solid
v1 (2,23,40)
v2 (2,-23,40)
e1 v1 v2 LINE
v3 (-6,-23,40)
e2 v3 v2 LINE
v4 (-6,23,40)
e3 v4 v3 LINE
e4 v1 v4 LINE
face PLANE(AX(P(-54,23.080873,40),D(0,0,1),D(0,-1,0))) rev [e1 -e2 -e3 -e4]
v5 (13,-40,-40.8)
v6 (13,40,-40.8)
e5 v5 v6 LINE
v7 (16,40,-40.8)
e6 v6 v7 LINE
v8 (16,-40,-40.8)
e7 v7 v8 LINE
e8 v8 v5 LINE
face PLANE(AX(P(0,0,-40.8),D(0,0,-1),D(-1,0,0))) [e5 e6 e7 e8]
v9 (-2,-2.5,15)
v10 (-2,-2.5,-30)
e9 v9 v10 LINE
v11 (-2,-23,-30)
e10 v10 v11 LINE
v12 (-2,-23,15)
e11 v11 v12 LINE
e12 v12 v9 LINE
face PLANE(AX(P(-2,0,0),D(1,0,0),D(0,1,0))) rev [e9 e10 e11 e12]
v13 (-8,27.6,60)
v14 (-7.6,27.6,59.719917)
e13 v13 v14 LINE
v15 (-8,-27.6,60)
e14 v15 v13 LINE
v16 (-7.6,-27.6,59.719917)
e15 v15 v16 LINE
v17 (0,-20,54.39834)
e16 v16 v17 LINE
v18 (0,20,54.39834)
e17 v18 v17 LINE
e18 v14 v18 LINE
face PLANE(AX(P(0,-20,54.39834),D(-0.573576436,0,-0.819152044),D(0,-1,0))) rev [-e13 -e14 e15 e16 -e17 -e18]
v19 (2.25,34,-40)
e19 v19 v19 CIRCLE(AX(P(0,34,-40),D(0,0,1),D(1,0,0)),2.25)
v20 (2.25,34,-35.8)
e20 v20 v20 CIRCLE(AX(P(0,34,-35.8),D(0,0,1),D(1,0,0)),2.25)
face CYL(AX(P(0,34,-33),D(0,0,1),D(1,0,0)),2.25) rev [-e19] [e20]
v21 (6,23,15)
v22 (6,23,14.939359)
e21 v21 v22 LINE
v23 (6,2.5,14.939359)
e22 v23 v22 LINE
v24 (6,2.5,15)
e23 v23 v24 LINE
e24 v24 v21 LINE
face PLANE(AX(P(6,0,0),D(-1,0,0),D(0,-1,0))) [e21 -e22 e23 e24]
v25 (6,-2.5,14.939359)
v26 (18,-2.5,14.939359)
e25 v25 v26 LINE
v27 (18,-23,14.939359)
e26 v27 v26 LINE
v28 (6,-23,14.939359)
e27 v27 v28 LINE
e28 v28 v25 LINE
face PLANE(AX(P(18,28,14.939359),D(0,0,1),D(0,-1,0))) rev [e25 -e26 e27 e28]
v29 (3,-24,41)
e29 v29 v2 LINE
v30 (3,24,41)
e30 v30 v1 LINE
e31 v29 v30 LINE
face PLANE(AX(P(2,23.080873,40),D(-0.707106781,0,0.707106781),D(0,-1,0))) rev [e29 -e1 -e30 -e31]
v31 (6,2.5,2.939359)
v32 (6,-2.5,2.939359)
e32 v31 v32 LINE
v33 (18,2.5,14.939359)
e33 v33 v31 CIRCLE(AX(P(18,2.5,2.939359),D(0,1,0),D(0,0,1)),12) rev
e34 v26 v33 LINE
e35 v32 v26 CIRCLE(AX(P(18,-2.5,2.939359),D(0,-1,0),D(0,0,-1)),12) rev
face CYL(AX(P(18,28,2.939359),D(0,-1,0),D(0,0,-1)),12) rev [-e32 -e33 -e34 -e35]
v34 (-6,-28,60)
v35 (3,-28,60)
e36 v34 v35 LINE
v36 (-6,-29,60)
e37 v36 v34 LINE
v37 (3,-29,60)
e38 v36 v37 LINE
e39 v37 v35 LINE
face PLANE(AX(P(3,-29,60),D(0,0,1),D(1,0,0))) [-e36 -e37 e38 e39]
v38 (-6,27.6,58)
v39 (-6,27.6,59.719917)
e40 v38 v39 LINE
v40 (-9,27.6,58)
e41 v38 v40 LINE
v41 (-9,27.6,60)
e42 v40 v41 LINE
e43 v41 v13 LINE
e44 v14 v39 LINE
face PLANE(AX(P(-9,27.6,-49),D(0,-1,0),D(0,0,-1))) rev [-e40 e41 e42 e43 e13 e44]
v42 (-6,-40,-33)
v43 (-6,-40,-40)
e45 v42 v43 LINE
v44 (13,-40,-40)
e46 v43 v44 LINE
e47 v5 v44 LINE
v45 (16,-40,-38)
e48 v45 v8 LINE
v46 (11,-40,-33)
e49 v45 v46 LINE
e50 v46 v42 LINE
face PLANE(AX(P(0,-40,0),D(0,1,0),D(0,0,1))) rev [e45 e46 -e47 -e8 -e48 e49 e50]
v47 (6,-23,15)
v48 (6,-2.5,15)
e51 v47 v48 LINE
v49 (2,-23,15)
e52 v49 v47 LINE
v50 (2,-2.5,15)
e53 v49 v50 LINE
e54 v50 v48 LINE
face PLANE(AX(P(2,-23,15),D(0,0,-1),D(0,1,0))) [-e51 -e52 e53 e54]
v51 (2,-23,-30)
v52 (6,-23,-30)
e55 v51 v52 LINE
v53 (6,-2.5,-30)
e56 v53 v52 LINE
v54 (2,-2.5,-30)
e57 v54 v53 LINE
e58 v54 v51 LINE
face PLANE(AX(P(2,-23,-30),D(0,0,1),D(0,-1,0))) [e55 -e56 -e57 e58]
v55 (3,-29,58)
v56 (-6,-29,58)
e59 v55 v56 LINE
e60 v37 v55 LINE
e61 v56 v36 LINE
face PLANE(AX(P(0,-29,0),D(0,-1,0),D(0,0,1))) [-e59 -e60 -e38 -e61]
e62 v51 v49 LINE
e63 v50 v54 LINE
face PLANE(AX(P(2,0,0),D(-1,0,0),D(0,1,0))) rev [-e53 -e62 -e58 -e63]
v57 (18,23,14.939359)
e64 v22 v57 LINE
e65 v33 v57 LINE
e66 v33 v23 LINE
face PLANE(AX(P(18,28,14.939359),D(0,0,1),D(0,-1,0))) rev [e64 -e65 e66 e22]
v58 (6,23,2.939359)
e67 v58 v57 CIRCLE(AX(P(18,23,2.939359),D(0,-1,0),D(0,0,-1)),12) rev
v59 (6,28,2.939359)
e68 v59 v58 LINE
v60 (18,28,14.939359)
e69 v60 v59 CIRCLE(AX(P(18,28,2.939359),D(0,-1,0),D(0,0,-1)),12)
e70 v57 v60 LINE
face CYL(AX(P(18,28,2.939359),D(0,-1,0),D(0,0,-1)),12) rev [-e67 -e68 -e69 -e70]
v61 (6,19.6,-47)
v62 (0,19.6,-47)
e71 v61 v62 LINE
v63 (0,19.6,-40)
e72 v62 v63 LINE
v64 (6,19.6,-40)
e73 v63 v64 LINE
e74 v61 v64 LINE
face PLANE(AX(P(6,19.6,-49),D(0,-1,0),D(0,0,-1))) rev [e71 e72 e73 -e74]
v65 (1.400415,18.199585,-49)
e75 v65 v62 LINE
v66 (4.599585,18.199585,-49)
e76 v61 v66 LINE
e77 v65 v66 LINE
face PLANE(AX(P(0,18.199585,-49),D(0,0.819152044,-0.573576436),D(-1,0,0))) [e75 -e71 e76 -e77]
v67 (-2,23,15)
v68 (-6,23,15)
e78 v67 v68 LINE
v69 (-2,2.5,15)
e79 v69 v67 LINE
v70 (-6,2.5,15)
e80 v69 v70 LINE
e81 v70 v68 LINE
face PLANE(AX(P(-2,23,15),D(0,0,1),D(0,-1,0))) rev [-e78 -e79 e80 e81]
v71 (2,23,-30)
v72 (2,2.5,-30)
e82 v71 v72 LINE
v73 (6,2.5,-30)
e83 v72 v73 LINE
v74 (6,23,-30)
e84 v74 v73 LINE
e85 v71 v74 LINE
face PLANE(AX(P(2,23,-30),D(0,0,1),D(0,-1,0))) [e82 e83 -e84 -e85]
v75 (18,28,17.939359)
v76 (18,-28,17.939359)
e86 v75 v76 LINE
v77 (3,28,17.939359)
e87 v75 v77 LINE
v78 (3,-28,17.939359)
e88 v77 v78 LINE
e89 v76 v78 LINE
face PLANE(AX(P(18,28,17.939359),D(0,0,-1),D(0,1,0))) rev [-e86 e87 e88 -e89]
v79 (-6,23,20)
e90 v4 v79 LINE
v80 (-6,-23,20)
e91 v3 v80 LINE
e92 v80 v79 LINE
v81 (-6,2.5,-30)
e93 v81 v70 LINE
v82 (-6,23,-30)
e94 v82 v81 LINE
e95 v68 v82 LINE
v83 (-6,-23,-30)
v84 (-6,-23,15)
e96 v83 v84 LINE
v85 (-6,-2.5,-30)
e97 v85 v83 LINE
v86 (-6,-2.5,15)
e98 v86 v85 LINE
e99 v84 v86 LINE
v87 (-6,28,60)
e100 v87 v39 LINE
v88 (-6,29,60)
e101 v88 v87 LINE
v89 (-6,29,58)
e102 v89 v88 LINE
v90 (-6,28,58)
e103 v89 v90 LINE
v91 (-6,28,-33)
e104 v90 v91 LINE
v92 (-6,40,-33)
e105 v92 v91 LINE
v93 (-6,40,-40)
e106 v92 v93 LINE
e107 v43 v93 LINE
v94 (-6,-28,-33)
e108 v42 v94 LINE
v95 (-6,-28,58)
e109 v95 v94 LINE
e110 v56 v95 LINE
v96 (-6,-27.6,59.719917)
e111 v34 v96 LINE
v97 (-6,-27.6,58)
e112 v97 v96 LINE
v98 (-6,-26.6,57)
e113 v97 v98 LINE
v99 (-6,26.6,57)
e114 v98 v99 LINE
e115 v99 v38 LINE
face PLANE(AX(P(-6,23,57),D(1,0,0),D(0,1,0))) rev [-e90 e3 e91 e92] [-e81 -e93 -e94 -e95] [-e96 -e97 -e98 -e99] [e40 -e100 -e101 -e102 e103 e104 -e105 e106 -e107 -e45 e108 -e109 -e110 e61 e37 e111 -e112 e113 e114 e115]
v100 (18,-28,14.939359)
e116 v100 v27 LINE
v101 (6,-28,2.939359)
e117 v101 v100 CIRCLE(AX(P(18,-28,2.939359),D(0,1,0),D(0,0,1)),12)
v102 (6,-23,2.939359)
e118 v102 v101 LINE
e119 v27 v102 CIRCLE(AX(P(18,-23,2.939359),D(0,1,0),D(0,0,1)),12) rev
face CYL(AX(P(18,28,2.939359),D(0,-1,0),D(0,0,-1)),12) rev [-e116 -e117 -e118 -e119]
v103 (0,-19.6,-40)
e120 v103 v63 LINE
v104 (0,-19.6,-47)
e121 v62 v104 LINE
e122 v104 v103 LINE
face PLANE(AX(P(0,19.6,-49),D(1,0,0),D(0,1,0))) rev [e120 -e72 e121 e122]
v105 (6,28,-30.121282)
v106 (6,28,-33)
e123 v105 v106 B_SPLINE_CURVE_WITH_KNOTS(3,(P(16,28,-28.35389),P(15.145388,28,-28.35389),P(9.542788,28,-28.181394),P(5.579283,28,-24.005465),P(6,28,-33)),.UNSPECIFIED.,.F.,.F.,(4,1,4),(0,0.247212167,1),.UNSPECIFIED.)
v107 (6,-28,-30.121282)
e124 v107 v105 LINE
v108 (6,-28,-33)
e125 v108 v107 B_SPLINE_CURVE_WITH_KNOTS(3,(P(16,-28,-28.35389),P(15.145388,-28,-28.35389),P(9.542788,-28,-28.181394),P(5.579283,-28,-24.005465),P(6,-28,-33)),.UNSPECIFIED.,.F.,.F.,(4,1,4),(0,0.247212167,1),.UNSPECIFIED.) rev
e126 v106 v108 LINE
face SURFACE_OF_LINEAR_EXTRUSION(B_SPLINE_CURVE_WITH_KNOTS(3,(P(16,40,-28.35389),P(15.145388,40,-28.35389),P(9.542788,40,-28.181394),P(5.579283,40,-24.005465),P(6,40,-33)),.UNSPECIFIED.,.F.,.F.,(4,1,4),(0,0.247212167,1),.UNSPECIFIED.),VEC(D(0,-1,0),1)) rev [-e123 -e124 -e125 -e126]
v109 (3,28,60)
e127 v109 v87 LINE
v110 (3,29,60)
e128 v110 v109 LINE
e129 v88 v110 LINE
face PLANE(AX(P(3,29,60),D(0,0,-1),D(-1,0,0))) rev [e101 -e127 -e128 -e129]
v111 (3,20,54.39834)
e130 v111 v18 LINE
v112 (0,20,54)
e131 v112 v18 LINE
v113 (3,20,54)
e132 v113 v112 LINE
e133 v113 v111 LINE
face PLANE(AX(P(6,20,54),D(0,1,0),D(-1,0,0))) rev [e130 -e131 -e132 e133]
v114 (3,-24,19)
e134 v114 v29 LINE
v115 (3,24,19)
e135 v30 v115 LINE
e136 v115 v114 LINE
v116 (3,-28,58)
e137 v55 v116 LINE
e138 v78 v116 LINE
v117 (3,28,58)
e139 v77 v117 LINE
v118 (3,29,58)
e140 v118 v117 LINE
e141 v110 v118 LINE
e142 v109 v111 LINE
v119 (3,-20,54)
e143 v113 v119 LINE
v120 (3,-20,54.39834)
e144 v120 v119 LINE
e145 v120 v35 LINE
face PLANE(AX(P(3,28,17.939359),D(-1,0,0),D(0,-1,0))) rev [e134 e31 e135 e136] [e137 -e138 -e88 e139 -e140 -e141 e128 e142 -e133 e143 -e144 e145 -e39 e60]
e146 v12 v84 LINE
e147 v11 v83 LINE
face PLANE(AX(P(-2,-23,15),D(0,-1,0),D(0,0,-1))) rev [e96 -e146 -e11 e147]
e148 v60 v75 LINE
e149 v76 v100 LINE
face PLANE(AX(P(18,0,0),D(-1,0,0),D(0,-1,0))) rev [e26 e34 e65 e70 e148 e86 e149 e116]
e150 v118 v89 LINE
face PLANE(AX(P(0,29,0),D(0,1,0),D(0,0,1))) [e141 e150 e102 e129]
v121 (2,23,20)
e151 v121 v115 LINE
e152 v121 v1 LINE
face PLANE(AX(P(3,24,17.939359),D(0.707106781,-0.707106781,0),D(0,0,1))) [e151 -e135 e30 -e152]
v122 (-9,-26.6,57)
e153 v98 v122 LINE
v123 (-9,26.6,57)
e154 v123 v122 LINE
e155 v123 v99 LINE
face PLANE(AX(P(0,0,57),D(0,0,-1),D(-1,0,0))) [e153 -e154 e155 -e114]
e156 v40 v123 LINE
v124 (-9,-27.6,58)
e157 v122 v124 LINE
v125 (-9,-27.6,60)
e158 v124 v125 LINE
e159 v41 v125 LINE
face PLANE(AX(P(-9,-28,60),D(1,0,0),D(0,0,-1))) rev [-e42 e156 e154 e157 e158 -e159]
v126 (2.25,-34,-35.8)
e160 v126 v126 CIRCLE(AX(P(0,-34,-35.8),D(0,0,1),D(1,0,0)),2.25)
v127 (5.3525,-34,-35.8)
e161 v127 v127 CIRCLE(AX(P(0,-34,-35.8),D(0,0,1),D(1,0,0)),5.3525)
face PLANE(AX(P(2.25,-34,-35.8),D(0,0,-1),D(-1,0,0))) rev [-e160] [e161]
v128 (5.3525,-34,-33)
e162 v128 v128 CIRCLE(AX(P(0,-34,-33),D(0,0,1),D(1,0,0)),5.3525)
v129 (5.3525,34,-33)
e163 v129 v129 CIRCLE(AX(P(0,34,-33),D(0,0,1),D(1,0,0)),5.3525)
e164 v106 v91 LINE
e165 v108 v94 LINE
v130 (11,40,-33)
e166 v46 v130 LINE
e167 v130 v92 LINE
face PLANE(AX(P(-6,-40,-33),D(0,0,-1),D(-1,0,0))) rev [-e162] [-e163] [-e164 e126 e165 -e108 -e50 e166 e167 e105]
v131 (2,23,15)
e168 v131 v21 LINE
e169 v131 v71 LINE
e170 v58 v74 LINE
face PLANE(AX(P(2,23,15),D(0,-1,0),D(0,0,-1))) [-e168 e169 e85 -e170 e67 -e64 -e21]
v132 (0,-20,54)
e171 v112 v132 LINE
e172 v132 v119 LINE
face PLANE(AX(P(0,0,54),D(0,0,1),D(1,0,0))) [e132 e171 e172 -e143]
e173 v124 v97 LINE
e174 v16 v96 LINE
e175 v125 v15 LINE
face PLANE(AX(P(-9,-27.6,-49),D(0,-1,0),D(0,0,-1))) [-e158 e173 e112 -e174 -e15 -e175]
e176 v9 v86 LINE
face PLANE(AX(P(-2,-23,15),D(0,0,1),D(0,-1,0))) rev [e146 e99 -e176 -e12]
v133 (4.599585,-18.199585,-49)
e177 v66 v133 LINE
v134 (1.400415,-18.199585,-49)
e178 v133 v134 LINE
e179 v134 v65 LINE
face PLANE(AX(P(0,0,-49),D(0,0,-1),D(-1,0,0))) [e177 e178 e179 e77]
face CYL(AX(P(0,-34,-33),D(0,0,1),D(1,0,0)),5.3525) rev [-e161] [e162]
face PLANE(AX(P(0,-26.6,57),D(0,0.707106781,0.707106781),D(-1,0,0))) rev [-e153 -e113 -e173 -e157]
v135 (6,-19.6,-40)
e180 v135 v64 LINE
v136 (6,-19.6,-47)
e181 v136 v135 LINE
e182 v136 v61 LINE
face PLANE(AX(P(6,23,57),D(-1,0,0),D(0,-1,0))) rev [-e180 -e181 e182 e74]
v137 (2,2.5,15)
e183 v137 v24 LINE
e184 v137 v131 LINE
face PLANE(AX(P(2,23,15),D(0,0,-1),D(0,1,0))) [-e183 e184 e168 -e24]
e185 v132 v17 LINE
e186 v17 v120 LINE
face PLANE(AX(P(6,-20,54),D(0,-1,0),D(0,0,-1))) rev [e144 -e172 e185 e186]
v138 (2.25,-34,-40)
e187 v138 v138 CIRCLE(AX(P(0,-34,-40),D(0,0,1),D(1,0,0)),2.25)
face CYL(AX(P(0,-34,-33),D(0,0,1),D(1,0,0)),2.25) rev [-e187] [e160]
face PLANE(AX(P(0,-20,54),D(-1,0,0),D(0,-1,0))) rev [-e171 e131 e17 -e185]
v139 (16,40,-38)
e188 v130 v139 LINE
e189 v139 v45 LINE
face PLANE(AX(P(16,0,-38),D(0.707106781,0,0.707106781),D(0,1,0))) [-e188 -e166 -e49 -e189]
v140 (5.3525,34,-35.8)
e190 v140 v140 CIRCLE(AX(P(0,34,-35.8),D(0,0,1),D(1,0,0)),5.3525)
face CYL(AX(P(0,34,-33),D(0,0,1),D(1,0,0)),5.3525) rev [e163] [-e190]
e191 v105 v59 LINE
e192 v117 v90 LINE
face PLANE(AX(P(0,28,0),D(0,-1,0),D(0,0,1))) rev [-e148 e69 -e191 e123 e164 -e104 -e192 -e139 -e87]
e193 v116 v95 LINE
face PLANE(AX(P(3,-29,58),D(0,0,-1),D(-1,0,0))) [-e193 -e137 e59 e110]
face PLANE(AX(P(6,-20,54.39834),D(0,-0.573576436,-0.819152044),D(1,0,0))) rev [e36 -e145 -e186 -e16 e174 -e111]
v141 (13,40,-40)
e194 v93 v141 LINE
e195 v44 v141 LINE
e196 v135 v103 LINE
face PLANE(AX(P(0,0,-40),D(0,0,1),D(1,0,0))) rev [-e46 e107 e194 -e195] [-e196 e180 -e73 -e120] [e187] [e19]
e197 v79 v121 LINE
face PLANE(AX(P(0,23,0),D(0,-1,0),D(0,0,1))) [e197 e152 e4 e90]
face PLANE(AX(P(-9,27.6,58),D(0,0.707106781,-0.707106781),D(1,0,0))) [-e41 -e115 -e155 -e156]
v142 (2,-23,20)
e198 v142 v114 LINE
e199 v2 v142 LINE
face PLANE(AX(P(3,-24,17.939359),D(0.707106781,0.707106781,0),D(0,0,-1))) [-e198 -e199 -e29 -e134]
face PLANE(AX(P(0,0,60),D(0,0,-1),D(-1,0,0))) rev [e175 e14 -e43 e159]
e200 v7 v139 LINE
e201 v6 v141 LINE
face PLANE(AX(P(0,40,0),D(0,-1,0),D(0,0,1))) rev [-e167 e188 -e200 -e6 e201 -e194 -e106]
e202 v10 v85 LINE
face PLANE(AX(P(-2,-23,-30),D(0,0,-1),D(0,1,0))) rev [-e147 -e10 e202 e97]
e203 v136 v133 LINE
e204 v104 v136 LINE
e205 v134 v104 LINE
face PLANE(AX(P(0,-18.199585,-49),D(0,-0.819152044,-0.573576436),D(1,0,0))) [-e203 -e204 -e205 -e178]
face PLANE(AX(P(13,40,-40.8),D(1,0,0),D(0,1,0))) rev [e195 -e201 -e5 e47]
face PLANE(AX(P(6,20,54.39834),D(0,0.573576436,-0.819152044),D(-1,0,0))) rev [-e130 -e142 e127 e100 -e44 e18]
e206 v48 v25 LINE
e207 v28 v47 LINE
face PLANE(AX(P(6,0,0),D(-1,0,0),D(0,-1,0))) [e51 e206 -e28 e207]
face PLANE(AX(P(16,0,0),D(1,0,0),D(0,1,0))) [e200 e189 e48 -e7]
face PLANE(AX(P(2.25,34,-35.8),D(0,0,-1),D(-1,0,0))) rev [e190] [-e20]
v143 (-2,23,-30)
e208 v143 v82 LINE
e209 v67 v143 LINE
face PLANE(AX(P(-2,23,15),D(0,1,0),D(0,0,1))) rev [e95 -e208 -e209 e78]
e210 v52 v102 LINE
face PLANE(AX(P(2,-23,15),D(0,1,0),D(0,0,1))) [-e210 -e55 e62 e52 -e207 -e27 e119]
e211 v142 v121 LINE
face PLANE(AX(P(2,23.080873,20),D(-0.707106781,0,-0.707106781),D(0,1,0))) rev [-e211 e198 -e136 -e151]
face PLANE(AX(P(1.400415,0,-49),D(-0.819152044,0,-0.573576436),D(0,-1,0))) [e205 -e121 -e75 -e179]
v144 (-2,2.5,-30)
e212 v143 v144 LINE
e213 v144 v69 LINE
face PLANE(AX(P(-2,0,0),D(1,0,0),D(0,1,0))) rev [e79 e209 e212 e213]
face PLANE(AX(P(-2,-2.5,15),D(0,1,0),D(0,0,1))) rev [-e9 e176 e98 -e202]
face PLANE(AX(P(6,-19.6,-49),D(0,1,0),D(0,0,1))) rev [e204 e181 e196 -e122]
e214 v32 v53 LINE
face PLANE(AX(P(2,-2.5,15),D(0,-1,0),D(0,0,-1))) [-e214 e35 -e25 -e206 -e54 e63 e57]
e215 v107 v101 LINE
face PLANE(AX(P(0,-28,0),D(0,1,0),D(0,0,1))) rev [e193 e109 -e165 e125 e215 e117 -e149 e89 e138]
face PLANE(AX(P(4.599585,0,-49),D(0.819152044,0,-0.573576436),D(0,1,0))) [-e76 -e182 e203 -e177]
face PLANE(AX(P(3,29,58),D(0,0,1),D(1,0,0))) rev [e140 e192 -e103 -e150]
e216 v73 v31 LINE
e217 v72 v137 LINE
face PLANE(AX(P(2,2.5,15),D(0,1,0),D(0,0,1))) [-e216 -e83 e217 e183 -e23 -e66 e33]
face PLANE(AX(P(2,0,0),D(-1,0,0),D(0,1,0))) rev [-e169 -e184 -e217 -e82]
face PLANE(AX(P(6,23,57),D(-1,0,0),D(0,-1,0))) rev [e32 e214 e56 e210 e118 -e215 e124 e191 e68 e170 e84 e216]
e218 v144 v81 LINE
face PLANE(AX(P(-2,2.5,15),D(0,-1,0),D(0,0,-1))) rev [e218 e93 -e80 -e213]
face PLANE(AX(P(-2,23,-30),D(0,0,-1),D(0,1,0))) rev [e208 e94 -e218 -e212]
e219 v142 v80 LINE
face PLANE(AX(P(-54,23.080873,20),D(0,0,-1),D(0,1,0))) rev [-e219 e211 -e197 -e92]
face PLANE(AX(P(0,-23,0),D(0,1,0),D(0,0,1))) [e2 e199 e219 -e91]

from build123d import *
from OCP.BRepFilletAPI import BRepFilletAPI_MakeChamfer

# Parameters (mm, degrees)
SKETCH_1_W              = 12
SKETCH_1_H              = 46
EXTRUDE_1_DEPTH         = 57
SKETCH_2_W              = 20
SKETCH_2_H              = 46.080872769
CUT_EXTRUDE_1_DEPTH     = 60
SKETCH_3_W              = 12
SKETCH_3_H              = 57
EXTRUDE_2_DEPTH         = 5
SKETCH_4_W              = 12
SKETCH_4_H              = 56
EXTRUDE_3_DEPTH         = 40
SKETCH_5_W              = 12
SKETCH_5_H              = 7
EXTRUDE_4_DEPTH         = 12
M4_A_1_D                = 4.5
M4_A_1_CBORE_D          = 10.705
M4_A_1_CBORE_DEPTH      = 2.8
SKETCH_8_W              = 15
SKETCH_8_H              = 56
EXTRUDE_5_DEPTH         = 3
SKETCH_9_W              = 6
SKETCH_9_H              = 40
CUT_EXTRUDE_2_DEPTH     = 6
CHAMFER_1_SIZE          = 8
CHAMFER_1_SIZE_2        = 5.601660306
SKETCH_10_W             = 6
SKETCH_10_H             = 39.2
EXTRUDE_6_DEPTH         = 9
CUT_EXTRUDE_START       = -4
CUT_EXTRUDE_3_OUTLINE_W = 3
CUT_EXTRUDE_3_OUTLINE_H = 0.4
CUT_EXTRUDE_3_DEPTH     = 5
CHAMFER_2_SIZE          = 1
CHAMFER_3_SIZE          = 2
CHAMFER_3_SIZE2         = 1.400415076
SKETCH_12_W             = 45
SKETCH_12_H             = 20.5
CUT_EXTRUDE_4_DEPTH     = 4
SKETCH_14_W             = 7
SKETCH_14_H             = 80
EXTRUDE_7_DEPTH         = 10
CUT_EXTRUDE_5_DEPTH     = 102.271911209
SKETCH_16_W             = 3
SKETCH_16_H             = 56
EXTRUDE_8_DEPTH         = 12
CHAMFER_5_SIZE          = 5
CUT_EXTRUDE_START_2     = -42.060641
SKETCH_17_W             = 3
SKETCH_17_H             = 56
CUT_EXTRUDE_6_DEPTH     = 42.060641
CHAMFER_4_SIZE          = 1
FILLET_1_R              = 12
SKETCH_22_W             = 3
SKETCH_22_H             = 80
EXTRUDE_11_DEPTH        = 0.8
SKETCH_24_W             = 9
SKETCH_24_H             = 2
EXTRUDE_13_DEPTH        = 1


with BuildPart() as part:
    # 스케치1 → 보스-돌출1 (new body)
    with BuildSketch(Plane.XY):
        Rectangle(SKETCH_1_W, SKETCH_1_H)
    extrude(amount=EXTRUDE_1_DEPTH)

    # 스케치2 → 컷-돌출1 (cut)
    with BuildSketch(Plane(origin=(6, 0, 0), x_dir=(0, 0, -1), z_dir=(1, 0, 0))):
        with Locations((-30, 0.040436385)):
            Rectangle(SKETCH_2_W, SKETCH_2_H)
    extrude(amount=-CUT_EXTRUDE_1_DEPTH, mode=Mode.SUBTRACT)


with BuildPart() as cut_extrude_1_piece_1:
    # of the separate pieces the step leaves, piece 1, a body of its own (cut_extrude_1_pieces)
    add(part.part.solids().sort_by_distance((-6, 23, 0))[0])



with BuildPart() as cut_extrude_1_piece_2:
    # of the separate pieces the step leaves, piece 2, a body of its own (cut_extrude_1_pieces)
    add(part.part.solids().sort_by_distance((6, 23, 40))[0])


with BuildPart() as cut_extrude_1_piece_1_1:
    add(cut_extrude_1_piece_1.part)

    add(cut_extrude_1_piece_2.part)  # 보스-돌출2 merges 컷-돌출1 piece 2
    # 스케치3 → 보스-돌출2 (add)
    with BuildSketch(Plane.XZ.offset(23)):
        with Locations((0, 28.5)):
            Rectangle(SKETCH_3_W, SKETCH_3_H)
    extrude_2 = extrude(amount=EXTRUDE_2_DEPTH)

    # 대칭 복사1: 보스-돌출2 across plane
    add(extrude_2.mirror(Plane.ZX))

    # 스케치4 → 보스-돌출3 (add)
    with BuildSketch(Plane(origin=(0, 0, 0), x_dir=(-1, 0, 0), z_dir=(0, 0, -1))):
        Rectangle(SKETCH_4_W, SKETCH_4_H)
    extrude(amount=EXTRUDE_3_DEPTH)

    # 스케치5 → 보스-돌출4 (add)
    with BuildSketch(Plane.XZ.offset(28)):
        with Locations((0, -36.5)):
            Rectangle(SKETCH_5_W, SKETCH_5_H)
    extrude_4 = extrude(amount=EXTRUDE_4_DEPTH)

    # 대칭 복사2: 보스-돌출4 across plane
    add(extrude_4.mirror(Plane.ZX))

    # M4 육각 머리 볼트용 카운터보어 (A 등급)1 (through all)
    with Locations(Plane.XY.offset(-33)):
        with Locations((0, -34), (0, 34)):
            CounterBoreHole(M4_A_1_D / 2, M4_A_1_CBORE_D / 2, M4_A_1_CBORE_DEPTH)

    # 스케치8 → 보스-돌출5 (add)
    with BuildSketch(Plane.XY.offset(57)):
        with Locations((-1.5, 0)):
            Rectangle(SKETCH_8_W, SKETCH_8_H)
    extrude(amount=EXTRUDE_5_DEPTH)

    # 스케치9 → 컷-돌출2 (cut)
    with BuildSketch(Plane.XY.offset(60)):
        with Locations((3, 0)):
            Rectangle(SKETCH_9_W, SKETCH_9_H)
    extrude(amount=-CUT_EXTRUDE_2_DEPTH, mode=Mode.SUBTRACT)

    # 모따기1
    chamfer_1_edges_1 = [cut_extrude_1_piece_1_1.edges().sort_by_distance(p)[0] for p in [
        (0, 0, 60),
    ]]
    chamfer_1_side_1 = [cut_extrude_1_piece_1_1.faces().sort_by_distance(p)[0] for p in [
        (-0.112033206, 0, 60),
    ]]
    chamfer_1_edges_2 = [cut_extrude_1_piece_1_1.edges().sort_by_distance(p)[0] for p in [
        (3, 20, 60),
    ]]
    chamfer_1_side_2 = [cut_extrude_1_piece_1_1.faces().sort_by_distance(p)[0] for p in [
        (3, 20.112033206, 60),
    ]]
    chamfer_1_edges_3 = [cut_extrude_1_piece_1_1.edges().sort_by_distance(p)[0] for p in [
        (3, -20, 60),
    ]]
    chamfer_1_side_3 = [cut_extrude_1_piece_1_1.faces().sort_by_distance(p)[0] for p in [
        (3, -20.112033206, 60),
    ]]
    chamfer_1 = BRepFilletAPI_MakeChamfer(cut_extrude_1_piece_1_1.part.solid().wrapped)
    for e in chamfer_1_edges_1:
        chamfer_1.Add(CHAMFER_1_SIZE - 0.0001, CHAMFER_1_SIZE_2 - 0.0001, e.wrapped, chamfer_1_side_1[0].wrapped)
    for e in chamfer_1_edges_2:
        chamfer_1.Add(CHAMFER_1_SIZE - 0.0001, CHAMFER_1_SIZE_2 - 0.0001, e.wrapped, chamfer_1_side_2[0].wrapped)
    for e in chamfer_1_edges_3:
        chamfer_1.Add(CHAMFER_1_SIZE - 0.0001, CHAMFER_1_SIZE_2 - 0.0001, e.wrapped, chamfer_1_side_3[0].wrapped)
    add(Compound.cast(chamfer_1.Shape()), mode=Mode.REPLACE)  # a hair under: the kernel refuses the full size

    # 스케치10 → 보스-돌출6 (add)
    with BuildSketch(Plane(origin=(0, 0, -40), x_dir=(-1, 0, 0), z_dir=(0, 0, -1))):
        with Locations((-3, 0)):
            Rectangle(SKETCH_10_W, SKETCH_10_H)
    extrude(amount=EXTRUDE_6_DEPTH)

    # 컷-돌출3: read off the stored shape, not the designer's step
    # 컷-돌출3 outline → 컷-돌출3 (cut)
    with BuildSketch(Plane.XY.offset(60).offset(CUT_EXTRUDE_START)):
        with Locations((-7.5, 27.8)):
            Rectangle(CUT_EXTRUDE_3_OUTLINE_W, CUT_EXTRUDE_3_OUTLINE_H)
        with Locations((-7.5, -27.8)):
            Rectangle(CUT_EXTRUDE_3_OUTLINE_W, CUT_EXTRUDE_3_OUTLINE_H)
    extrude(amount=CUT_EXTRUDE_3_DEPTH, mode=Mode.SUBTRACT)

    # 모따기2
    chamfer_2_edges = [cut_extrude_1_piece_1_1.edges().sort_by_distance(p)[0] for p in [
        (-7.5, -27.6, 57),
        (-7.5, 27.6, 57),
    ]]
    chamfer(chamfer_2_edges, length=CHAMFER_2_SIZE)

    # 모따기3: one chamfer whose edges measure the first distance from different faces: ONE call of the kernel's chamfer builder (chamfer() names one face for all edges)
    chamfer_3_edges_1 = [cut_extrude_1_piece_1_1.edges().sort_by_distance(p)[0] for p in [
        (6, 0, -49),
    ]]
    chamfer_3_side_1 = [cut_extrude_1_piece_1_1.faces().sort_by_distance(p)[0] for p in [
        (6, 0, -1.976539193),
    ]]
    chamfer_3_edges_2 = [cut_extrude_1_piece_1_1.edges().sort_by_distance(p)[0] for p in [
        (3, -19.6, -49),
    ]]
    chamfer_3_side_2 = [cut_extrude_1_piece_1_1.faces().sort_by_distance(p)[0] for p in [
        (3, -19.6, -44.5),
    ]]
    chamfer_3_edges_3 = [cut_extrude_1_piece_1_1.edges().sort_by_distance(p)[0] for p in [
        (0, 0, -49),
    ]]
    chamfer_3_side_3 = [cut_extrude_1_piece_1_1.faces().sort_by_distance(p)[0] for p in [
        (0, 0, -44.5),
    ]]
    chamfer_3_edges_4 = [cut_extrude_1_piece_1_1.edges().sort_by_distance(p)[0] for p in [
        (3, 19.6, -49),
    ]]
    chamfer_3_side_4 = [cut_extrude_1_piece_1_1.faces().sort_by_distance(p)[0] for p in [
        (3, 19.6, -44.5),
    ]]
    chamfer_3 = BRepFilletAPI_MakeChamfer(cut_extrude_1_piece_1_1.part.solid().wrapped)
    for e in chamfer_3_edges_1:
        chamfer_3.Add(CHAMFER_3_SIZE, CHAMFER_3_SIZE2, e.wrapped, chamfer_3_side_1[0].wrapped)  # the first distance lies on this face
    for e in chamfer_3_edges_2:
        chamfer_3.Add(CHAMFER_3_SIZE, CHAMFER_3_SIZE2, e.wrapped, chamfer_3_side_2[0].wrapped)  # the first distance lies on this face
    for e in chamfer_3_edges_3:
        chamfer_3.Add(CHAMFER_3_SIZE, CHAMFER_3_SIZE2, e.wrapped, chamfer_3_side_3[0].wrapped)  # the first distance lies on this face
    for e in chamfer_3_edges_4:
        chamfer_3.Add(CHAMFER_3_SIZE, CHAMFER_3_SIZE2, e.wrapped, chamfer_3_side_4[0].wrapped)  # the first distance lies on this face
    add(Compound.cast(chamfer_3.Shape()), mode=Mode.REPLACE)

    # 스케치12 → 컷-돌출4 (cut)
    with BuildSketch(Plane.ZY.offset(6)):
        with Locations((-7.5, 12.75)):
            Rectangle(SKETCH_12_W, SKETCH_12_H)
        with Locations((-7.5, -12.75)):
            Rectangle(SKETCH_12_W, SKETCH_12_H)
    cut_extrude_4 = extrude(amount=-CUT_EXTRUDE_4_DEPTH, mode=Mode.SUBTRACT)

    # 대칭 복사3: 컷-돌출4 across plane
    add(cut_extrude_4.mirror(Plane.ZY), mode=Mode.SUBTRACT)

    # 스케치14 → 보스-돌출7 (add)
    with BuildSketch(Plane(origin=(6, 0, 0), x_dir=(0, 0, -1), z_dir=(1, 0, 0))):
        with Locations((36.5, 0)):
            Rectangle(SKETCH_14_W, SKETCH_14_H)
    extrude(amount=EXTRUDE_7_DEPTH)

    # 스케치15 → 컷-돌출5 (cut, through all)
    with BuildSketch(Plane.XZ.offset(40)):
        with BuildLine():
            Line((6, -33), (16, -33))
            Line((16, -33), (16, -28.353890031))
            add(Edge.make_bspline(
                [(6, -33), (5.579283, -24.005465365), (9.542787604, -28.181394392), (15.145388019, -28.353890031), (16, -28.353890031)],
                knots=[0, 0, 0, 0, 0.752787833, 1, 1, 1, 1], degree=3))
        make_face()
    extrude(amount=-CUT_EXTRUDE_5_DEPTH, mode=Mode.SUBTRACT)

    # 스케치16 → 보스-돌출8 (add)
    with BuildSketch(Plane(origin=(6, 0, 0), x_dir=(0, 0, -1), z_dir=(1, 0, 0))):
        with Locations((-16.43935887, 0)):
            Rectangle(SKETCH_16_W, SKETCH_16_H)
    extrude(amount=EXTRUDE_8_DEPTH)

    # 모따기5
    chamfer_5_edges = [cut_extrude_1_piece_1_1.edges().sort_by_distance(p)[0] for p in [
        (16, 0, -33),
    ]]
    chamfer(chamfer_5_edges, length=CHAMFER_5_SIZE)

    # 스케치17 → 컷-돌출6 (cut)
    with BuildSketch(Plane.XY.offset(60).offset(CUT_EXTRUDE_START_2)):
        with Locations((4.5, 0)):
            Rectangle(SKETCH_17_W, SKETCH_17_H)
    extrude(amount=CUT_EXTRUDE_6_DEPTH, mode=Mode.SUBTRACT)

    # 모따기4
    chamfer_4_edges = [cut_extrude_1_piece_1_1.edges().sort_by_distance(p)[0] for p in [
        (3, -23, 30),
        (3, 23, 30),
        (3, 0, 20),
        (3, 0, 40),
    ]]
    chamfer(chamfer_4_edges, length=CHAMFER_4_SIZE)

    # 필렛1
    fillet_1_edges = [cut_extrude_1_piece_1_1.edges().sort_by_distance(p)[0] for p in [
        (6, -25.5, 14.93935887),
        (6, 0, 14.93935887),
        (6, 25.5, 14.93935887),
    ]]
    fillet(fillet_1_edges, radius=FILLET_1_R - 0.0001)  # a hair under: the kernel refuses the full size

    # 스케치22 → 보스-돌출11 (add)
    with BuildSketch(Plane(origin=(0, 0, -40), x_dir=(-1, 0, 0), z_dir=(0, 0, -1))):
        with Locations((-14.5, 0)):
            Rectangle(SKETCH_22_W, SKETCH_22_H)
    extrude(amount=EXTRUDE_11_DEPTH)

    # 스케치24 → 보스-돌출13 (add)
    with BuildSketch(Plane(origin=(0, 28, 0), x_dir=(1, 0, 0), z_dir=(0, 1, 0))):
        with Locations((-1.5, -59)):
            Rectangle(SKETCH_24_W, SKETCH_24_H)
    extrude_13 = extrude(amount=EXTRUDE_13_DEPTH)

    # 대칭 복사4: 보스-돌출13 across plane
    add(extrude_13.mirror(Plane.ZX))


solid = cut_extrude_1_piece_1_1.part
